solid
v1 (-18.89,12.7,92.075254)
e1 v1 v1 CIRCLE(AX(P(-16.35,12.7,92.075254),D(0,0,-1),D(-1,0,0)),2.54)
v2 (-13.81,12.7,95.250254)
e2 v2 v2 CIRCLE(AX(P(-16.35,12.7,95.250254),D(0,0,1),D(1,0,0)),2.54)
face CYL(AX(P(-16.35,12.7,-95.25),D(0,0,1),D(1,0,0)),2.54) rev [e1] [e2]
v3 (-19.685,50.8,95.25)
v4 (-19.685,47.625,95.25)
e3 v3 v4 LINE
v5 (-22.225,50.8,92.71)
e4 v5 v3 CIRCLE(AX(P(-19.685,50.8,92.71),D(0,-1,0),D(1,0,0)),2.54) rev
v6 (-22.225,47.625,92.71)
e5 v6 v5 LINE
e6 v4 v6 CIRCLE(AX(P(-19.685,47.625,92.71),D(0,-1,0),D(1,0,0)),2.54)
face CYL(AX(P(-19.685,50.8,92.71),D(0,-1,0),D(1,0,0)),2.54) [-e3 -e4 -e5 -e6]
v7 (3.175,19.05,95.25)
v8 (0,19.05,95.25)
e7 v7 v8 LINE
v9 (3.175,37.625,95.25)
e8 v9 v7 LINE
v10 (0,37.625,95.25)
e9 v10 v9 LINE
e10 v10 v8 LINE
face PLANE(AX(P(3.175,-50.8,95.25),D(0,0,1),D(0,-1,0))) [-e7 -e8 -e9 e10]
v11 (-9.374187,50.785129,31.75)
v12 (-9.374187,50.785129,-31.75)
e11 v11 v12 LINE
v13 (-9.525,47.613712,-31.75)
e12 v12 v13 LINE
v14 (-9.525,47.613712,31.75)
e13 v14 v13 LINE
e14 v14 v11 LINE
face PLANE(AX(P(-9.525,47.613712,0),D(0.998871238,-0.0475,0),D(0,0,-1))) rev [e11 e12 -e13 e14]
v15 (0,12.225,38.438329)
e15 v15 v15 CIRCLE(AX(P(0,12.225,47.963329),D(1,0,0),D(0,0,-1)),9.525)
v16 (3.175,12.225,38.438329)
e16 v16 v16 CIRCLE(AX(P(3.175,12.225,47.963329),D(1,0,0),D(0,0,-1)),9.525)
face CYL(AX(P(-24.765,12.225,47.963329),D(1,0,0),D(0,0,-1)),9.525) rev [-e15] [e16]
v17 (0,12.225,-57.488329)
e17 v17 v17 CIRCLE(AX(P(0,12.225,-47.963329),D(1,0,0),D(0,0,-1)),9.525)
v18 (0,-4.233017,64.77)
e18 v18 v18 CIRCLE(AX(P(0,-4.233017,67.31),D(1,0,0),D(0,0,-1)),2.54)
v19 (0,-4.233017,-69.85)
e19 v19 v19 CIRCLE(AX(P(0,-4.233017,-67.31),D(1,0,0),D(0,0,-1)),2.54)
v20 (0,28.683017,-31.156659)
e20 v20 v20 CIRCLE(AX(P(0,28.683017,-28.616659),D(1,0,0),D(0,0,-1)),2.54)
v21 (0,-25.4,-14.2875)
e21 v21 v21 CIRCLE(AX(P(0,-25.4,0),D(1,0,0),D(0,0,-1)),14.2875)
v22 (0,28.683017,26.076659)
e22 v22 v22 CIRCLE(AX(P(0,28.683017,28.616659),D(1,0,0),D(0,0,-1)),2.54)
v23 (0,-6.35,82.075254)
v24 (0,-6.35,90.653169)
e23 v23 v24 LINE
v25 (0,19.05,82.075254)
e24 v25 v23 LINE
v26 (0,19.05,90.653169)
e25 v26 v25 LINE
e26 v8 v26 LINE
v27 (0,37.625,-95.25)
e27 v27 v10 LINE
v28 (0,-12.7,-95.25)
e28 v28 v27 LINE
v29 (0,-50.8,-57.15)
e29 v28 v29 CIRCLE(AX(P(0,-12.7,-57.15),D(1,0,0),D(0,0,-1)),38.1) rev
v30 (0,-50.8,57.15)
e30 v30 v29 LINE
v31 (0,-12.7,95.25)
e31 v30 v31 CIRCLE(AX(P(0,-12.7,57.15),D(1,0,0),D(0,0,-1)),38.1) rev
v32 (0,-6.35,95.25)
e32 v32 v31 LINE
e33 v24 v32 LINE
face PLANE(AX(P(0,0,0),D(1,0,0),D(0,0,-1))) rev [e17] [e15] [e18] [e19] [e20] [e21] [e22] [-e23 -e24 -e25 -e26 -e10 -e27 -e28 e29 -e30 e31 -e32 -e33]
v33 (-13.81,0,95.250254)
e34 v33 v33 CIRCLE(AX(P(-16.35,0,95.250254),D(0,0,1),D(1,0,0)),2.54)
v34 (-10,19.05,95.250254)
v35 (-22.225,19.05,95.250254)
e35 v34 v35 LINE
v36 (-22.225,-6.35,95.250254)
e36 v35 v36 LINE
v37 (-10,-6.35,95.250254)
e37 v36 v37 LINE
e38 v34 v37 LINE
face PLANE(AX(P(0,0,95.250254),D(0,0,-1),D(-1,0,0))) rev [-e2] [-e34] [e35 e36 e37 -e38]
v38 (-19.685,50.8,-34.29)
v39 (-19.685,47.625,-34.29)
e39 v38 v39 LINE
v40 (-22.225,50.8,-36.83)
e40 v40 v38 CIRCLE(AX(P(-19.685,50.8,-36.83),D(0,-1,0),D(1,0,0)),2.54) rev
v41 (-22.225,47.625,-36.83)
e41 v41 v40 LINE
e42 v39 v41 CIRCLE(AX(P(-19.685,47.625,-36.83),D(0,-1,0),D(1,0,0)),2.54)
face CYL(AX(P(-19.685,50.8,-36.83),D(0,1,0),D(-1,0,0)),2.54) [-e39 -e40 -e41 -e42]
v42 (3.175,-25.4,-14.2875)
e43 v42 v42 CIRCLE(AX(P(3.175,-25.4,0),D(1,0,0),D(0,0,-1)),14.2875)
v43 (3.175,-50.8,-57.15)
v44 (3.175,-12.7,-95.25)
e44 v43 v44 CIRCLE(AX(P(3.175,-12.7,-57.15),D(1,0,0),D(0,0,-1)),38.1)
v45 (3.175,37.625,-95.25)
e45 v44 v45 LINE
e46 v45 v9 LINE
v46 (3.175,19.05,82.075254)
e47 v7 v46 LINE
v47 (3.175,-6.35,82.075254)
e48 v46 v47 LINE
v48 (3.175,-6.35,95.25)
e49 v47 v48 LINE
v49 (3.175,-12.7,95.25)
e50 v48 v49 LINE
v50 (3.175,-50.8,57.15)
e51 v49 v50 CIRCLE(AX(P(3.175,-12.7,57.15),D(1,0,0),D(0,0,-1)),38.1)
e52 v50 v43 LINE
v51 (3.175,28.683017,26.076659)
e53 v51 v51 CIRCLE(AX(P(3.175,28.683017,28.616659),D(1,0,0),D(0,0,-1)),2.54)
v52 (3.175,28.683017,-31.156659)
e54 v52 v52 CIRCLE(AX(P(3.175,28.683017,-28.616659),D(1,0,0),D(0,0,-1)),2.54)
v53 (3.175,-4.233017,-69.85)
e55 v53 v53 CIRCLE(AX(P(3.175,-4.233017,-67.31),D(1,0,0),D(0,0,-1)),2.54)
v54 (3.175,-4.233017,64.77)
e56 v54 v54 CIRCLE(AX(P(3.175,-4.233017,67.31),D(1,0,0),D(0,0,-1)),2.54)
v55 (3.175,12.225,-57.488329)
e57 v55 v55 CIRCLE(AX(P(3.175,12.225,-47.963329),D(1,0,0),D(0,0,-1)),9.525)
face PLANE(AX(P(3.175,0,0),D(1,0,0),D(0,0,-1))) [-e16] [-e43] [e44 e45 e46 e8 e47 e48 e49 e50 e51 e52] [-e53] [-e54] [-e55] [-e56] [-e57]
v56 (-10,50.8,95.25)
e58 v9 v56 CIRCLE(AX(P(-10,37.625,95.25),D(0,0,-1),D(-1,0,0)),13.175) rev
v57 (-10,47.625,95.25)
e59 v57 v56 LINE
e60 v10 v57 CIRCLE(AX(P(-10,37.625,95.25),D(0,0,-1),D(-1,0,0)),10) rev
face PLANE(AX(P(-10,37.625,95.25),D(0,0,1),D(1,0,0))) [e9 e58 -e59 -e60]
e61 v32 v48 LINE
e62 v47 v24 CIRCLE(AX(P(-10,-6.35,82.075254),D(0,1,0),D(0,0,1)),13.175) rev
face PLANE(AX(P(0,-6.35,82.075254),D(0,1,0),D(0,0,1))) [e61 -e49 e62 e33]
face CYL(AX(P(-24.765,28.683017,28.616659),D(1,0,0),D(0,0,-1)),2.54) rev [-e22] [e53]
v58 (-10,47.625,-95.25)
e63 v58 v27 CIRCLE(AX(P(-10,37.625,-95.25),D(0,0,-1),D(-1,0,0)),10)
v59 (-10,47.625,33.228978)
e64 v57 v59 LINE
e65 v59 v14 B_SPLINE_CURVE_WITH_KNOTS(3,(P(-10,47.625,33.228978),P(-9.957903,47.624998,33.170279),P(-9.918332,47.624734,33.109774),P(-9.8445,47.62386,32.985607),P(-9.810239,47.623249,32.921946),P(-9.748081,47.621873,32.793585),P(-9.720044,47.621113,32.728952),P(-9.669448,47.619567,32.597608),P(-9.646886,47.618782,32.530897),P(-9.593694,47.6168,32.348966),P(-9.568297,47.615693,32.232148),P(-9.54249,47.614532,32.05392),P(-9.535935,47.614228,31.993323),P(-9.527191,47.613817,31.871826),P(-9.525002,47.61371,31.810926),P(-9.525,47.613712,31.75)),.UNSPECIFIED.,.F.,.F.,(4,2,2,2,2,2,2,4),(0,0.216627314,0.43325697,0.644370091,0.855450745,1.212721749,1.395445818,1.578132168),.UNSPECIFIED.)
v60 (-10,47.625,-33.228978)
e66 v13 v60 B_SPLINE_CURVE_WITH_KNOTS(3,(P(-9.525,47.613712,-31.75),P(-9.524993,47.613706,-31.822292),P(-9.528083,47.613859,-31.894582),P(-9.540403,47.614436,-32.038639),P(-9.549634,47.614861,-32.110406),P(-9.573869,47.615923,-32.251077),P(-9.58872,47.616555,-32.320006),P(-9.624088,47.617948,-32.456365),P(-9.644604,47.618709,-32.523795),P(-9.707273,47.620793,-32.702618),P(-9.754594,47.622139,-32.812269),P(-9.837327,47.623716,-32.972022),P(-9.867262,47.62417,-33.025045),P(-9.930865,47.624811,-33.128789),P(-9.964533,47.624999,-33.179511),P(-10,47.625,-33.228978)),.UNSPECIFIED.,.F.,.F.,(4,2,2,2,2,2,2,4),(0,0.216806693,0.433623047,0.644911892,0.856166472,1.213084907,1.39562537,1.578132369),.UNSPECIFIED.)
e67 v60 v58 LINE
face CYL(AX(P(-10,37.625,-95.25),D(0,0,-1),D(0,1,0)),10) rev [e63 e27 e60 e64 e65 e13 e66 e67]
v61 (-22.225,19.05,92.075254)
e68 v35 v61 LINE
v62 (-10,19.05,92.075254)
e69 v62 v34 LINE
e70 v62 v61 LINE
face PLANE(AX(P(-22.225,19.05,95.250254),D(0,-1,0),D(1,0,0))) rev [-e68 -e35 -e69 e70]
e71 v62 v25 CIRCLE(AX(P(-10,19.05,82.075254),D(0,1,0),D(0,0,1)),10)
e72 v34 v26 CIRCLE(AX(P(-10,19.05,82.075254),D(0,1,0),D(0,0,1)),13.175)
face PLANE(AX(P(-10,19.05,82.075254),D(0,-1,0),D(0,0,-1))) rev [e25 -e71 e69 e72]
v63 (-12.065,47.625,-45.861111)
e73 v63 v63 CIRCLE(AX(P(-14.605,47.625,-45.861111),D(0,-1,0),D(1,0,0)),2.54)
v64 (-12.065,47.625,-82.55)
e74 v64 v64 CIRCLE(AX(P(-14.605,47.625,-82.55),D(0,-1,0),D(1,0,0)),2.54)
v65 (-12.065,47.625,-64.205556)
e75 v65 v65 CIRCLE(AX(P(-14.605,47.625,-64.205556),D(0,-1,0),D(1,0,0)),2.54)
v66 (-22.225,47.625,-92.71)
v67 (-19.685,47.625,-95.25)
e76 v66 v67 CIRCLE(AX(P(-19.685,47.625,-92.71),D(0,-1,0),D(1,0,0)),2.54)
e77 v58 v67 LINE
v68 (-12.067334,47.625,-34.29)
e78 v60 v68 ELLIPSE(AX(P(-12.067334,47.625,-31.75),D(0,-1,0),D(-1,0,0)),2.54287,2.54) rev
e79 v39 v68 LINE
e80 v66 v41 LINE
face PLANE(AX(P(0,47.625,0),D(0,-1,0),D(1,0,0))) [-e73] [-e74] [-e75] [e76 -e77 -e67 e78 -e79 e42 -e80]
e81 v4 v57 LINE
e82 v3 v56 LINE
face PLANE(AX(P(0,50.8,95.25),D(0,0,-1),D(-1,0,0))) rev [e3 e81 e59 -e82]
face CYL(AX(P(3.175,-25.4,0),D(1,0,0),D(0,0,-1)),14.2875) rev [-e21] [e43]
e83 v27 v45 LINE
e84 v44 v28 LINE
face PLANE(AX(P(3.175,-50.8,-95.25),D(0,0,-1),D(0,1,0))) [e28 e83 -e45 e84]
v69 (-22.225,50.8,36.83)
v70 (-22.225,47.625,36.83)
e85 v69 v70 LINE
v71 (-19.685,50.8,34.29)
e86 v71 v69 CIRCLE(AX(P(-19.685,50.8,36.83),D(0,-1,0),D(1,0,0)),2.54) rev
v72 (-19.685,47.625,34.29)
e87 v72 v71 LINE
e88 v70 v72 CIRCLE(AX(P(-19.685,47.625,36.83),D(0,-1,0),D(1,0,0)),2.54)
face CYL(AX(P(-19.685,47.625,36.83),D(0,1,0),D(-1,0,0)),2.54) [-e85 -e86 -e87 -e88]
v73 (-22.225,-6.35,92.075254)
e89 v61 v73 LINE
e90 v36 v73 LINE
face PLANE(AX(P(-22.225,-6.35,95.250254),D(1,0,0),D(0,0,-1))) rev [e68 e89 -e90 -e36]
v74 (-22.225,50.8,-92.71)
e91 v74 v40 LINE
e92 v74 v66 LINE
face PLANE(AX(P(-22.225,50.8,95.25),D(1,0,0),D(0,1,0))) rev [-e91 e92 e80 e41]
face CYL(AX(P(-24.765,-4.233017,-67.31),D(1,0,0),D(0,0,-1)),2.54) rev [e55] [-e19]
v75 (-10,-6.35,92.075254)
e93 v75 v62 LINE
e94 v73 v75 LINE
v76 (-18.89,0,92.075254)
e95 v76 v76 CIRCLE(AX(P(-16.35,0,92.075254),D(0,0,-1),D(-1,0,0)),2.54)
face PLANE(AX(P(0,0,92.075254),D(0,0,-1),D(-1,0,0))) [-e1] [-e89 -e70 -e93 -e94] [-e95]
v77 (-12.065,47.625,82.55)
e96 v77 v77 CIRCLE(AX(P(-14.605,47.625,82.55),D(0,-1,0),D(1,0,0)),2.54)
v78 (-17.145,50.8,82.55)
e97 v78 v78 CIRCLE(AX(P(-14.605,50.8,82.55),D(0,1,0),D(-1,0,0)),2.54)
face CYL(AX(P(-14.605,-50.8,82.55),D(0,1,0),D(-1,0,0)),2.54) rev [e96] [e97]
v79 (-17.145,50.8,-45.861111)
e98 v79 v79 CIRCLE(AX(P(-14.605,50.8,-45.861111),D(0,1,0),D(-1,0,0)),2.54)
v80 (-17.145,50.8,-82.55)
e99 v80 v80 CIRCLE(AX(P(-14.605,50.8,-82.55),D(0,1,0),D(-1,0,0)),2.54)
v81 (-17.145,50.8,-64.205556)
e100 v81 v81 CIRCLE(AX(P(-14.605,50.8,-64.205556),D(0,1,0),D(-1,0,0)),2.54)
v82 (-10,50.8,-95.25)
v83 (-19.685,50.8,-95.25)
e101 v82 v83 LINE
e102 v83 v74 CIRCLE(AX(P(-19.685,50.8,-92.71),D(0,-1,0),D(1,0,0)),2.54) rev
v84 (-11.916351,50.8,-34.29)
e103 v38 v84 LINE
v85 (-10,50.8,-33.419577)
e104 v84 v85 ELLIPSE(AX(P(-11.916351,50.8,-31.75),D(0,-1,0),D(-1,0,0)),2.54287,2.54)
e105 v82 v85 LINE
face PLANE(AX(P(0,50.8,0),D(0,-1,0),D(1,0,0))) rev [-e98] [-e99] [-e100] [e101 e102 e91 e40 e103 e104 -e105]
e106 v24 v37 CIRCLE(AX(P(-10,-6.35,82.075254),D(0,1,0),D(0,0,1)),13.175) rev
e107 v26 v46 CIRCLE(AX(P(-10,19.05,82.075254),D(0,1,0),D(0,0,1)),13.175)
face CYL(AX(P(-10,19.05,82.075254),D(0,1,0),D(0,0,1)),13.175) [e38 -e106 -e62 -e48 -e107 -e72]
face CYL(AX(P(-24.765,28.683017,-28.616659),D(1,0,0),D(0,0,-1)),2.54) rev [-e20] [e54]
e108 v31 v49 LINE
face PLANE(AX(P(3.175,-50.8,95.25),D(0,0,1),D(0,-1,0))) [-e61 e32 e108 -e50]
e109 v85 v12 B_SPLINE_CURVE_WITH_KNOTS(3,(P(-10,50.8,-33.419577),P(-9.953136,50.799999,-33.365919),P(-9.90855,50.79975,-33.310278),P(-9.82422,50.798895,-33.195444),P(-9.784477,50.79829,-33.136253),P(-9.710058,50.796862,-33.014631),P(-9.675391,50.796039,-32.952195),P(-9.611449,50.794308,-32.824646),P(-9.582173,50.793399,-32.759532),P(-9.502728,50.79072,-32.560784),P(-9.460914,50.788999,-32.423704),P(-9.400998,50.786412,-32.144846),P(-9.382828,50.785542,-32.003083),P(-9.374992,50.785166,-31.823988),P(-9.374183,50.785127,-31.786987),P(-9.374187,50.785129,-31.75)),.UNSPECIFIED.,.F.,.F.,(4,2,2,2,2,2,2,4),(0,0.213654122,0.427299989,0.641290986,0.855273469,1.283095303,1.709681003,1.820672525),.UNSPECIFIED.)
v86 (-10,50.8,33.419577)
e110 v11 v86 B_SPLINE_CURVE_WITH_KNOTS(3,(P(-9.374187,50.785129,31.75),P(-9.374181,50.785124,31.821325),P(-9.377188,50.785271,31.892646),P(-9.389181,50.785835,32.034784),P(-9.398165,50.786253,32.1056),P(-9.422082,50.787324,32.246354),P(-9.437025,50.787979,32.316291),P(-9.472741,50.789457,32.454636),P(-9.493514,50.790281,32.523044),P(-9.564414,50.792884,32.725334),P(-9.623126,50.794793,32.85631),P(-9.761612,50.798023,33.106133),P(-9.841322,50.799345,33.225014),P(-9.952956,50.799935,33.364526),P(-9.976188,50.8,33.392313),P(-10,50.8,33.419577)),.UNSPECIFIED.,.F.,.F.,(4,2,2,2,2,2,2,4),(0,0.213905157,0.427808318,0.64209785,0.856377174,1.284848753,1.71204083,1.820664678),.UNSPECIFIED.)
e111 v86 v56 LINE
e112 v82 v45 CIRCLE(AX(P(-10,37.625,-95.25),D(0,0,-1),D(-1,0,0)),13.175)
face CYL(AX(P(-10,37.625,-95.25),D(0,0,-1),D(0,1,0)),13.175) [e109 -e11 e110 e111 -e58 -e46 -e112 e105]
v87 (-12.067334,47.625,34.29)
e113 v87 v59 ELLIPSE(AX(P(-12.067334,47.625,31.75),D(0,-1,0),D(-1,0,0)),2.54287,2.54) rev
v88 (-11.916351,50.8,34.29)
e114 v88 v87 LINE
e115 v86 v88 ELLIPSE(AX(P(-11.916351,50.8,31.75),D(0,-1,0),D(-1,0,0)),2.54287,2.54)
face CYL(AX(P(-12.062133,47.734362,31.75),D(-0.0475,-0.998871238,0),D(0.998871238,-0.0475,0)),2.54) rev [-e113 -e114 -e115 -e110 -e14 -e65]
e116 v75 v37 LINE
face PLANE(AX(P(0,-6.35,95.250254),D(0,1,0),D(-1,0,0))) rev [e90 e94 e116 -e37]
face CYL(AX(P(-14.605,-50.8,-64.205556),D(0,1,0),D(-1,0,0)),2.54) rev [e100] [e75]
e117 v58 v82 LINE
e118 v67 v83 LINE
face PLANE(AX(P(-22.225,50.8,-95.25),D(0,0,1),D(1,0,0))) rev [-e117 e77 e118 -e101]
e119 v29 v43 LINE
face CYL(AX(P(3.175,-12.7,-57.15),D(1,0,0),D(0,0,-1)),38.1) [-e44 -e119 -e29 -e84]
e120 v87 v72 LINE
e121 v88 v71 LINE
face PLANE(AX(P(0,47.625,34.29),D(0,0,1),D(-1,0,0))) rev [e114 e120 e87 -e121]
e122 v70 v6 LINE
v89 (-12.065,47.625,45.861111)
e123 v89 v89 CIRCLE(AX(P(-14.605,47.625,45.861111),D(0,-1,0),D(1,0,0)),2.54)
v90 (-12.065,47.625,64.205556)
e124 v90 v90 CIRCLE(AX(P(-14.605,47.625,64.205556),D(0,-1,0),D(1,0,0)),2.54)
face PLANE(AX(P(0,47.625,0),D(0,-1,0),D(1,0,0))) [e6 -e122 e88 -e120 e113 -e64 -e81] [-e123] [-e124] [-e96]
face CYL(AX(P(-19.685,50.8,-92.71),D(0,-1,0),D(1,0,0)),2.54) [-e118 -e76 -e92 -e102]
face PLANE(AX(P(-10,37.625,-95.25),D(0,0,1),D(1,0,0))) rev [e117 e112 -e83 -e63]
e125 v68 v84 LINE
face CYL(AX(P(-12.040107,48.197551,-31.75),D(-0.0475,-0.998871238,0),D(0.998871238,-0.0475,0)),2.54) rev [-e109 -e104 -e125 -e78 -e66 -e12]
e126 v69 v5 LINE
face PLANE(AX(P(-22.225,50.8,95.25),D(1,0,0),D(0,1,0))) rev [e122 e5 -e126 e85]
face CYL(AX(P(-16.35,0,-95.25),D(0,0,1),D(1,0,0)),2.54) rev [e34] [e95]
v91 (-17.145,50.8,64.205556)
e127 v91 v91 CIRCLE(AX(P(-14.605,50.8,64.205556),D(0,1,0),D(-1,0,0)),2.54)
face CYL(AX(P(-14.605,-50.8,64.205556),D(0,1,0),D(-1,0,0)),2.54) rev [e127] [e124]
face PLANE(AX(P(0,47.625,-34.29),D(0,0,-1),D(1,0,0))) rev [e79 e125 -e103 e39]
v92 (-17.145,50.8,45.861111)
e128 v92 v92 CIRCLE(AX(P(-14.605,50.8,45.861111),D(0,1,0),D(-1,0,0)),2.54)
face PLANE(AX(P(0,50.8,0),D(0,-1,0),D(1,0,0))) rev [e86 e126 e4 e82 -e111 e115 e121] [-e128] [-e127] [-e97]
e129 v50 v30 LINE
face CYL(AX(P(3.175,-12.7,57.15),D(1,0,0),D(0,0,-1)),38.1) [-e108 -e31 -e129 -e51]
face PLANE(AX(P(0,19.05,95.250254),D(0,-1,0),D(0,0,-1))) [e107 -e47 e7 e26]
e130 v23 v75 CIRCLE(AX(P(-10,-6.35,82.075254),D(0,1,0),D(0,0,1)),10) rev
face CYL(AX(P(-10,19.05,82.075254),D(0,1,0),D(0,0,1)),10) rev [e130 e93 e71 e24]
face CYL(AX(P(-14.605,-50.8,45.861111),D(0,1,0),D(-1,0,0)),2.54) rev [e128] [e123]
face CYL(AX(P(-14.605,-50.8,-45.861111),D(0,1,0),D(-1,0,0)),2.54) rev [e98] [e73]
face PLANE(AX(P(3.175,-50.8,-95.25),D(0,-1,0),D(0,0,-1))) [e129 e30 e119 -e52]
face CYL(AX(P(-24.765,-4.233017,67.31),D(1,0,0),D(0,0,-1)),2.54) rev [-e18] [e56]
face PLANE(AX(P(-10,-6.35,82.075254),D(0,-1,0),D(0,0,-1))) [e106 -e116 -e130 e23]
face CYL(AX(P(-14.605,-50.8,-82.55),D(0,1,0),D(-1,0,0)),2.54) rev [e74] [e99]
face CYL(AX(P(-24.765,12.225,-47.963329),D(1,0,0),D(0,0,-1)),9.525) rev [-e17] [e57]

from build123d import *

# Parameters (mm, degrees)
SKETCH1_W                    = 190.5
SKETCH1_H                    = 101.6
BOSS_EXTRUDE1_DEPTH          = 3.175
SKETCH2_R                    = 14.2875
CUT_EXTRUDE1_DEPTH           = 3.175
EDGE_FLANGE1_STRIP_W         = 32.7
EDGE_FLANGE1_STRIP_H         = 3.175
EDGE_FLANGE1_STRIP_CUT_DEPTH = 190.5
EDGE_FLANGE1_DEPTH           = 190.5
SKETCH12_R                   = 9.525
SKETCH12_R_2                 = 2.54
CUT_EXTRUDE2_DEPTH           = 27.94
FILLET1_R                    = 38.1
SKETCH15_W                   = 3.175
SKETCH15_H                   = 25.4
BOSS_EXTRUDE2_DEPTH          = 0.000254
EDGE_FLANGE4_STRIP_W         = 32.7
EDGE_FLANGE4_STRIP_H         = 3.175
EDGE_FLANGE4_STRIP_CUT_DEPTH = 25.4
EDGE_FLANGE4_DEPTH           = 25.4
SKETCH26_R                   = 2.54
CUT_EXTRUDE3_DEPTH           = 142.028796748
SKETCH27_R                   = 2.54
CUT_EXTRUDE4_DEPTH           = 199.405991339
CUT_EXTRUDE5_START           = -34.29
CUT_EXTRUDE5_DEPTH           = 68.58
FILLET2_R                    = 2.54


# Read off the part's stored shape, not the designer's step: Cut-Extrude5
# Sheet-metal steps are written as plain solids
with BuildPart() as part:
    # Sketch1 → Boss-Extrude1 (new body)
    with BuildSketch(Plane(origin=(0, 0, 0), x_dir=(0, 0, -1), z_dir=(1, 0, 0))):
        Rectangle(SKETCH1_W, SKETCH1_H)
    extrude(amount=BOSS_EXTRUDE1_DEPTH)

    # Sketch2 → Cut-Extrude1 (cut)
    with BuildSketch(Plane(origin=(3.175, 0, 0), x_dir=(0, 0, -1), z_dir=(1, 0, 0))):
        with Locations((0, -25.4)):
            Circle(SKETCH2_R)
    extrude(amount=-CUT_EXTRUDE1_DEPTH, mode=Mode.SUBTRACT)

    # Edge-Flange1 strip (across the edge) → Edge-Flange1 strip cut (cut)
    with BuildSketch(Plane(origin=(0, 50.8, 95.25), x_dir=(0, -1, 0), z_dir=(0, 0, -1))):
        with Locations((-3.175, -1.5875)):
            Rectangle(EDGE_FLANGE1_STRIP_W, EDGE_FLANGE1_STRIP_H)
    extrude(amount=EDGE_FLANGE1_STRIP_CUT_DEPTH, mode=Mode.SUBTRACT)

    # Edge-Flange1 section (across the edge) → Edge-Flange1 (add)
    with BuildSketch(Plane(origin=(0, 50.8, 95.25), x_dir=(0, -1, 0), z_dir=(0, 0, -1))):
        with BuildLine():
            Line((0, 10), (0, 22.225))
            Line((0, 22.225), (3.175, 22.225))
            Line((3.175, 22.225), (3.175, 10))
            ThreePointArc((3.175, 10), (6.103932188, 2.928932188), (13.175, 0))
            Line((13.175, 0), (13.175, -3.175))
            ThreePointArc((13.175, -3.175), (3.858868158, 0.683868158), (0, 10))
        make_face()
    extrude(amount=EDGE_FLANGE1_DEPTH)

    # Sketch12 → Cut-Extrude2 (cut)
    with BuildSketch(Plane(origin=(3.175, 0, 0), x_dir=(0, 0, -1), z_dir=(1, 0, 0))):
        with Locations((-47.963329482, 12.225)):
            Circle(SKETCH12_R)
        with Locations((-28.616658964, 28.683017495)):
            Circle(SKETCH12_R_2)
        with Locations((-67.31, -4.233017495)):
            Circle(SKETCH12_R_2)
        with Locations((47.963329482, 12.225)):
            Circle(SKETCH12_R)
        with Locations((28.616658964, 28.683017495)):
            Circle(SKETCH12_R_2)
        with Locations((67.31, -4.233017495)):
            Circle(SKETCH12_R_2)
    extrude(amount=-CUT_EXTRUDE2_DEPTH, mode=Mode.SUBTRACT)

    # Fillet1
    fillet1_edges = [part.edges().sort_by_distance(p)[0] for p in [
        (1.5875, -50.8, 95.25),
        (1.5875, -50.8, -95.25),
    ]]
    fillet(fillet1_edges, radius=FILLET1_R)

    # Sketch15 → Boss-Extrude2 (add)
    with BuildSketch(Plane.XY.offset(95.25)):
        with Locations((1.5875, 6.35)):
            Rectangle(SKETCH15_W, SKETCH15_H)
    extrude(amount=BOSS_EXTRUDE2_DEPTH)

    # Edge-Flange4 strip (across the edge) → Edge-Flange4 strip cut (cut)
    with BuildSketch(Plane(origin=(0, -6.35, 95.250254), x_dir=(0, 0, -1), z_dir=(0, 1, 0))):
        with Locations((-3.175, -1.5875)):
            Rectangle(EDGE_FLANGE4_STRIP_W, EDGE_FLANGE4_STRIP_H)
    extrude(amount=EDGE_FLANGE4_STRIP_CUT_DEPTH, mode=Mode.SUBTRACT)

    # Edge-Flange4 section (across the edge) → Edge-Flange4 (add)
    with BuildSketch(Plane(origin=(0, -6.35, 95.250254), x_dir=(0, 0, -1), z_dir=(0, 1, 0))):
        with BuildLine():
            Line((0, 10), (0, 22.225))
            Line((0, 22.225), (3.175, 22.225))
            Line((3.175, 22.225), (3.175, 10))
            ThreePointArc((3.175, 10), (6.103932188, 2.928932188), (13.175, 0))
            Line((13.175, 0), (13.175, -3.175))
            ThreePointArc((13.175, -3.175), (3.858868158, 0.683868158), (0, 10))
        make_face()
    extrude(amount=EDGE_FLANGE4_DEPTH)

    # Sketch26 → Cut-Extrude3 (cut, through all)
    with BuildSketch(Plane(origin=(0, 50.8, 0), x_dir=(1, 0, 0), z_dir=(0, 1, 0))):
        with Locations(Location((-14.605, -82.55, 0), (0, 0, 180))):
            Circle(SKETCH26_R)
        with Locations(Location((-14.605, -64.205555556, 0), (0, 0, 180))):
            Circle(SKETCH26_R)
        with Locations(Location((-14.605, -45.861111111, 0), (0, 0, 180))):
            Circle(SKETCH26_R)
        with Locations(Location((-14.605, -27.516666667, 0), (0, 0, 180))):
            Circle(SKETCH26_R)
        with Locations(Location((-14.605, -9.172222222, 0), (0, 0, 180))):
            Circle(SKETCH26_R)
        with Locations(Location((-14.605, 9.172222222, 0), (0, 0, 180))):
            Circle(SKETCH26_R)
        with Locations(Location((-14.605, 27.516666667, 0), (0, 0, 180))):
            Circle(SKETCH26_R)
        with Locations(Location((-14.605, 45.861111111, 0), (0, 0, 180))):
            Circle(SKETCH26_R)
        with Locations(Location((-14.605, 64.205555556, 0), (0, 0, 180))):
            Circle(SKETCH26_R)
        with Locations(Location((-14.605, 82.55, 0), (0, 0, 180))):
            Circle(SKETCH26_R)
    extrude(amount=-CUT_EXTRUDE3_DEPTH, mode=Mode.SUBTRACT)

    # Sketch27 → Cut-Extrude4 (cut, through all)
    with BuildSketch(Plane.XY.offset(95.250254)):
        with Locations((-16.35, 12.7)):
            Circle(SKETCH27_R)
        with Locations((-16.35, 0)):
            Circle(SKETCH27_R)
    extrude(amount=-CUT_EXTRUDE4_DEPTH, mode=Mode.SUBTRACT)

    # Cut-Extrude5 outline → Cut-Extrude5 (cut)
    with BuildSketch(Plane.XY.offset(CUT_EXTRUDE5_START)):
        with BuildLine():
            ThreePointArc((-10, 47.625), (-9.762432951, 47.622177697), (-9.525, 47.61371238))
            Line((-9.525, 47.61371238), (-9.3741875, 50.78512856))
            ThreePointArc((-9.3741875, 50.78512856), (-9.687005413, 50.796281615), (-10, 50.8))
            Line((-10, 50.8), (-22.225, 50.8))
            Line((-22.225, 50.8), (-22.225, 47.625))
            Line((-22.225, 47.625), (-10, 47.625))
        make_face()
    extrude(amount=CUT_EXTRUDE5_DEPTH, mode=Mode.SUBTRACT)

    # Fillet2
    fillet2_edges = [part.edges().sort_by_distance(p)[0] for p in [
        (-22.225, 49.2125, 95.25),
        (-22.225, 49.2125, 34.29),
        (-9.44959375, 49.19942047, 34.29),
        (-9.44959375, 49.19942047, -34.29),
        (-22.225, 49.2125, -34.29),
        (-22.225, 49.2125, -95.25),
    ]]
    fillet(fillet2_edges, radius=FILLET2_R)


solid = part.part
